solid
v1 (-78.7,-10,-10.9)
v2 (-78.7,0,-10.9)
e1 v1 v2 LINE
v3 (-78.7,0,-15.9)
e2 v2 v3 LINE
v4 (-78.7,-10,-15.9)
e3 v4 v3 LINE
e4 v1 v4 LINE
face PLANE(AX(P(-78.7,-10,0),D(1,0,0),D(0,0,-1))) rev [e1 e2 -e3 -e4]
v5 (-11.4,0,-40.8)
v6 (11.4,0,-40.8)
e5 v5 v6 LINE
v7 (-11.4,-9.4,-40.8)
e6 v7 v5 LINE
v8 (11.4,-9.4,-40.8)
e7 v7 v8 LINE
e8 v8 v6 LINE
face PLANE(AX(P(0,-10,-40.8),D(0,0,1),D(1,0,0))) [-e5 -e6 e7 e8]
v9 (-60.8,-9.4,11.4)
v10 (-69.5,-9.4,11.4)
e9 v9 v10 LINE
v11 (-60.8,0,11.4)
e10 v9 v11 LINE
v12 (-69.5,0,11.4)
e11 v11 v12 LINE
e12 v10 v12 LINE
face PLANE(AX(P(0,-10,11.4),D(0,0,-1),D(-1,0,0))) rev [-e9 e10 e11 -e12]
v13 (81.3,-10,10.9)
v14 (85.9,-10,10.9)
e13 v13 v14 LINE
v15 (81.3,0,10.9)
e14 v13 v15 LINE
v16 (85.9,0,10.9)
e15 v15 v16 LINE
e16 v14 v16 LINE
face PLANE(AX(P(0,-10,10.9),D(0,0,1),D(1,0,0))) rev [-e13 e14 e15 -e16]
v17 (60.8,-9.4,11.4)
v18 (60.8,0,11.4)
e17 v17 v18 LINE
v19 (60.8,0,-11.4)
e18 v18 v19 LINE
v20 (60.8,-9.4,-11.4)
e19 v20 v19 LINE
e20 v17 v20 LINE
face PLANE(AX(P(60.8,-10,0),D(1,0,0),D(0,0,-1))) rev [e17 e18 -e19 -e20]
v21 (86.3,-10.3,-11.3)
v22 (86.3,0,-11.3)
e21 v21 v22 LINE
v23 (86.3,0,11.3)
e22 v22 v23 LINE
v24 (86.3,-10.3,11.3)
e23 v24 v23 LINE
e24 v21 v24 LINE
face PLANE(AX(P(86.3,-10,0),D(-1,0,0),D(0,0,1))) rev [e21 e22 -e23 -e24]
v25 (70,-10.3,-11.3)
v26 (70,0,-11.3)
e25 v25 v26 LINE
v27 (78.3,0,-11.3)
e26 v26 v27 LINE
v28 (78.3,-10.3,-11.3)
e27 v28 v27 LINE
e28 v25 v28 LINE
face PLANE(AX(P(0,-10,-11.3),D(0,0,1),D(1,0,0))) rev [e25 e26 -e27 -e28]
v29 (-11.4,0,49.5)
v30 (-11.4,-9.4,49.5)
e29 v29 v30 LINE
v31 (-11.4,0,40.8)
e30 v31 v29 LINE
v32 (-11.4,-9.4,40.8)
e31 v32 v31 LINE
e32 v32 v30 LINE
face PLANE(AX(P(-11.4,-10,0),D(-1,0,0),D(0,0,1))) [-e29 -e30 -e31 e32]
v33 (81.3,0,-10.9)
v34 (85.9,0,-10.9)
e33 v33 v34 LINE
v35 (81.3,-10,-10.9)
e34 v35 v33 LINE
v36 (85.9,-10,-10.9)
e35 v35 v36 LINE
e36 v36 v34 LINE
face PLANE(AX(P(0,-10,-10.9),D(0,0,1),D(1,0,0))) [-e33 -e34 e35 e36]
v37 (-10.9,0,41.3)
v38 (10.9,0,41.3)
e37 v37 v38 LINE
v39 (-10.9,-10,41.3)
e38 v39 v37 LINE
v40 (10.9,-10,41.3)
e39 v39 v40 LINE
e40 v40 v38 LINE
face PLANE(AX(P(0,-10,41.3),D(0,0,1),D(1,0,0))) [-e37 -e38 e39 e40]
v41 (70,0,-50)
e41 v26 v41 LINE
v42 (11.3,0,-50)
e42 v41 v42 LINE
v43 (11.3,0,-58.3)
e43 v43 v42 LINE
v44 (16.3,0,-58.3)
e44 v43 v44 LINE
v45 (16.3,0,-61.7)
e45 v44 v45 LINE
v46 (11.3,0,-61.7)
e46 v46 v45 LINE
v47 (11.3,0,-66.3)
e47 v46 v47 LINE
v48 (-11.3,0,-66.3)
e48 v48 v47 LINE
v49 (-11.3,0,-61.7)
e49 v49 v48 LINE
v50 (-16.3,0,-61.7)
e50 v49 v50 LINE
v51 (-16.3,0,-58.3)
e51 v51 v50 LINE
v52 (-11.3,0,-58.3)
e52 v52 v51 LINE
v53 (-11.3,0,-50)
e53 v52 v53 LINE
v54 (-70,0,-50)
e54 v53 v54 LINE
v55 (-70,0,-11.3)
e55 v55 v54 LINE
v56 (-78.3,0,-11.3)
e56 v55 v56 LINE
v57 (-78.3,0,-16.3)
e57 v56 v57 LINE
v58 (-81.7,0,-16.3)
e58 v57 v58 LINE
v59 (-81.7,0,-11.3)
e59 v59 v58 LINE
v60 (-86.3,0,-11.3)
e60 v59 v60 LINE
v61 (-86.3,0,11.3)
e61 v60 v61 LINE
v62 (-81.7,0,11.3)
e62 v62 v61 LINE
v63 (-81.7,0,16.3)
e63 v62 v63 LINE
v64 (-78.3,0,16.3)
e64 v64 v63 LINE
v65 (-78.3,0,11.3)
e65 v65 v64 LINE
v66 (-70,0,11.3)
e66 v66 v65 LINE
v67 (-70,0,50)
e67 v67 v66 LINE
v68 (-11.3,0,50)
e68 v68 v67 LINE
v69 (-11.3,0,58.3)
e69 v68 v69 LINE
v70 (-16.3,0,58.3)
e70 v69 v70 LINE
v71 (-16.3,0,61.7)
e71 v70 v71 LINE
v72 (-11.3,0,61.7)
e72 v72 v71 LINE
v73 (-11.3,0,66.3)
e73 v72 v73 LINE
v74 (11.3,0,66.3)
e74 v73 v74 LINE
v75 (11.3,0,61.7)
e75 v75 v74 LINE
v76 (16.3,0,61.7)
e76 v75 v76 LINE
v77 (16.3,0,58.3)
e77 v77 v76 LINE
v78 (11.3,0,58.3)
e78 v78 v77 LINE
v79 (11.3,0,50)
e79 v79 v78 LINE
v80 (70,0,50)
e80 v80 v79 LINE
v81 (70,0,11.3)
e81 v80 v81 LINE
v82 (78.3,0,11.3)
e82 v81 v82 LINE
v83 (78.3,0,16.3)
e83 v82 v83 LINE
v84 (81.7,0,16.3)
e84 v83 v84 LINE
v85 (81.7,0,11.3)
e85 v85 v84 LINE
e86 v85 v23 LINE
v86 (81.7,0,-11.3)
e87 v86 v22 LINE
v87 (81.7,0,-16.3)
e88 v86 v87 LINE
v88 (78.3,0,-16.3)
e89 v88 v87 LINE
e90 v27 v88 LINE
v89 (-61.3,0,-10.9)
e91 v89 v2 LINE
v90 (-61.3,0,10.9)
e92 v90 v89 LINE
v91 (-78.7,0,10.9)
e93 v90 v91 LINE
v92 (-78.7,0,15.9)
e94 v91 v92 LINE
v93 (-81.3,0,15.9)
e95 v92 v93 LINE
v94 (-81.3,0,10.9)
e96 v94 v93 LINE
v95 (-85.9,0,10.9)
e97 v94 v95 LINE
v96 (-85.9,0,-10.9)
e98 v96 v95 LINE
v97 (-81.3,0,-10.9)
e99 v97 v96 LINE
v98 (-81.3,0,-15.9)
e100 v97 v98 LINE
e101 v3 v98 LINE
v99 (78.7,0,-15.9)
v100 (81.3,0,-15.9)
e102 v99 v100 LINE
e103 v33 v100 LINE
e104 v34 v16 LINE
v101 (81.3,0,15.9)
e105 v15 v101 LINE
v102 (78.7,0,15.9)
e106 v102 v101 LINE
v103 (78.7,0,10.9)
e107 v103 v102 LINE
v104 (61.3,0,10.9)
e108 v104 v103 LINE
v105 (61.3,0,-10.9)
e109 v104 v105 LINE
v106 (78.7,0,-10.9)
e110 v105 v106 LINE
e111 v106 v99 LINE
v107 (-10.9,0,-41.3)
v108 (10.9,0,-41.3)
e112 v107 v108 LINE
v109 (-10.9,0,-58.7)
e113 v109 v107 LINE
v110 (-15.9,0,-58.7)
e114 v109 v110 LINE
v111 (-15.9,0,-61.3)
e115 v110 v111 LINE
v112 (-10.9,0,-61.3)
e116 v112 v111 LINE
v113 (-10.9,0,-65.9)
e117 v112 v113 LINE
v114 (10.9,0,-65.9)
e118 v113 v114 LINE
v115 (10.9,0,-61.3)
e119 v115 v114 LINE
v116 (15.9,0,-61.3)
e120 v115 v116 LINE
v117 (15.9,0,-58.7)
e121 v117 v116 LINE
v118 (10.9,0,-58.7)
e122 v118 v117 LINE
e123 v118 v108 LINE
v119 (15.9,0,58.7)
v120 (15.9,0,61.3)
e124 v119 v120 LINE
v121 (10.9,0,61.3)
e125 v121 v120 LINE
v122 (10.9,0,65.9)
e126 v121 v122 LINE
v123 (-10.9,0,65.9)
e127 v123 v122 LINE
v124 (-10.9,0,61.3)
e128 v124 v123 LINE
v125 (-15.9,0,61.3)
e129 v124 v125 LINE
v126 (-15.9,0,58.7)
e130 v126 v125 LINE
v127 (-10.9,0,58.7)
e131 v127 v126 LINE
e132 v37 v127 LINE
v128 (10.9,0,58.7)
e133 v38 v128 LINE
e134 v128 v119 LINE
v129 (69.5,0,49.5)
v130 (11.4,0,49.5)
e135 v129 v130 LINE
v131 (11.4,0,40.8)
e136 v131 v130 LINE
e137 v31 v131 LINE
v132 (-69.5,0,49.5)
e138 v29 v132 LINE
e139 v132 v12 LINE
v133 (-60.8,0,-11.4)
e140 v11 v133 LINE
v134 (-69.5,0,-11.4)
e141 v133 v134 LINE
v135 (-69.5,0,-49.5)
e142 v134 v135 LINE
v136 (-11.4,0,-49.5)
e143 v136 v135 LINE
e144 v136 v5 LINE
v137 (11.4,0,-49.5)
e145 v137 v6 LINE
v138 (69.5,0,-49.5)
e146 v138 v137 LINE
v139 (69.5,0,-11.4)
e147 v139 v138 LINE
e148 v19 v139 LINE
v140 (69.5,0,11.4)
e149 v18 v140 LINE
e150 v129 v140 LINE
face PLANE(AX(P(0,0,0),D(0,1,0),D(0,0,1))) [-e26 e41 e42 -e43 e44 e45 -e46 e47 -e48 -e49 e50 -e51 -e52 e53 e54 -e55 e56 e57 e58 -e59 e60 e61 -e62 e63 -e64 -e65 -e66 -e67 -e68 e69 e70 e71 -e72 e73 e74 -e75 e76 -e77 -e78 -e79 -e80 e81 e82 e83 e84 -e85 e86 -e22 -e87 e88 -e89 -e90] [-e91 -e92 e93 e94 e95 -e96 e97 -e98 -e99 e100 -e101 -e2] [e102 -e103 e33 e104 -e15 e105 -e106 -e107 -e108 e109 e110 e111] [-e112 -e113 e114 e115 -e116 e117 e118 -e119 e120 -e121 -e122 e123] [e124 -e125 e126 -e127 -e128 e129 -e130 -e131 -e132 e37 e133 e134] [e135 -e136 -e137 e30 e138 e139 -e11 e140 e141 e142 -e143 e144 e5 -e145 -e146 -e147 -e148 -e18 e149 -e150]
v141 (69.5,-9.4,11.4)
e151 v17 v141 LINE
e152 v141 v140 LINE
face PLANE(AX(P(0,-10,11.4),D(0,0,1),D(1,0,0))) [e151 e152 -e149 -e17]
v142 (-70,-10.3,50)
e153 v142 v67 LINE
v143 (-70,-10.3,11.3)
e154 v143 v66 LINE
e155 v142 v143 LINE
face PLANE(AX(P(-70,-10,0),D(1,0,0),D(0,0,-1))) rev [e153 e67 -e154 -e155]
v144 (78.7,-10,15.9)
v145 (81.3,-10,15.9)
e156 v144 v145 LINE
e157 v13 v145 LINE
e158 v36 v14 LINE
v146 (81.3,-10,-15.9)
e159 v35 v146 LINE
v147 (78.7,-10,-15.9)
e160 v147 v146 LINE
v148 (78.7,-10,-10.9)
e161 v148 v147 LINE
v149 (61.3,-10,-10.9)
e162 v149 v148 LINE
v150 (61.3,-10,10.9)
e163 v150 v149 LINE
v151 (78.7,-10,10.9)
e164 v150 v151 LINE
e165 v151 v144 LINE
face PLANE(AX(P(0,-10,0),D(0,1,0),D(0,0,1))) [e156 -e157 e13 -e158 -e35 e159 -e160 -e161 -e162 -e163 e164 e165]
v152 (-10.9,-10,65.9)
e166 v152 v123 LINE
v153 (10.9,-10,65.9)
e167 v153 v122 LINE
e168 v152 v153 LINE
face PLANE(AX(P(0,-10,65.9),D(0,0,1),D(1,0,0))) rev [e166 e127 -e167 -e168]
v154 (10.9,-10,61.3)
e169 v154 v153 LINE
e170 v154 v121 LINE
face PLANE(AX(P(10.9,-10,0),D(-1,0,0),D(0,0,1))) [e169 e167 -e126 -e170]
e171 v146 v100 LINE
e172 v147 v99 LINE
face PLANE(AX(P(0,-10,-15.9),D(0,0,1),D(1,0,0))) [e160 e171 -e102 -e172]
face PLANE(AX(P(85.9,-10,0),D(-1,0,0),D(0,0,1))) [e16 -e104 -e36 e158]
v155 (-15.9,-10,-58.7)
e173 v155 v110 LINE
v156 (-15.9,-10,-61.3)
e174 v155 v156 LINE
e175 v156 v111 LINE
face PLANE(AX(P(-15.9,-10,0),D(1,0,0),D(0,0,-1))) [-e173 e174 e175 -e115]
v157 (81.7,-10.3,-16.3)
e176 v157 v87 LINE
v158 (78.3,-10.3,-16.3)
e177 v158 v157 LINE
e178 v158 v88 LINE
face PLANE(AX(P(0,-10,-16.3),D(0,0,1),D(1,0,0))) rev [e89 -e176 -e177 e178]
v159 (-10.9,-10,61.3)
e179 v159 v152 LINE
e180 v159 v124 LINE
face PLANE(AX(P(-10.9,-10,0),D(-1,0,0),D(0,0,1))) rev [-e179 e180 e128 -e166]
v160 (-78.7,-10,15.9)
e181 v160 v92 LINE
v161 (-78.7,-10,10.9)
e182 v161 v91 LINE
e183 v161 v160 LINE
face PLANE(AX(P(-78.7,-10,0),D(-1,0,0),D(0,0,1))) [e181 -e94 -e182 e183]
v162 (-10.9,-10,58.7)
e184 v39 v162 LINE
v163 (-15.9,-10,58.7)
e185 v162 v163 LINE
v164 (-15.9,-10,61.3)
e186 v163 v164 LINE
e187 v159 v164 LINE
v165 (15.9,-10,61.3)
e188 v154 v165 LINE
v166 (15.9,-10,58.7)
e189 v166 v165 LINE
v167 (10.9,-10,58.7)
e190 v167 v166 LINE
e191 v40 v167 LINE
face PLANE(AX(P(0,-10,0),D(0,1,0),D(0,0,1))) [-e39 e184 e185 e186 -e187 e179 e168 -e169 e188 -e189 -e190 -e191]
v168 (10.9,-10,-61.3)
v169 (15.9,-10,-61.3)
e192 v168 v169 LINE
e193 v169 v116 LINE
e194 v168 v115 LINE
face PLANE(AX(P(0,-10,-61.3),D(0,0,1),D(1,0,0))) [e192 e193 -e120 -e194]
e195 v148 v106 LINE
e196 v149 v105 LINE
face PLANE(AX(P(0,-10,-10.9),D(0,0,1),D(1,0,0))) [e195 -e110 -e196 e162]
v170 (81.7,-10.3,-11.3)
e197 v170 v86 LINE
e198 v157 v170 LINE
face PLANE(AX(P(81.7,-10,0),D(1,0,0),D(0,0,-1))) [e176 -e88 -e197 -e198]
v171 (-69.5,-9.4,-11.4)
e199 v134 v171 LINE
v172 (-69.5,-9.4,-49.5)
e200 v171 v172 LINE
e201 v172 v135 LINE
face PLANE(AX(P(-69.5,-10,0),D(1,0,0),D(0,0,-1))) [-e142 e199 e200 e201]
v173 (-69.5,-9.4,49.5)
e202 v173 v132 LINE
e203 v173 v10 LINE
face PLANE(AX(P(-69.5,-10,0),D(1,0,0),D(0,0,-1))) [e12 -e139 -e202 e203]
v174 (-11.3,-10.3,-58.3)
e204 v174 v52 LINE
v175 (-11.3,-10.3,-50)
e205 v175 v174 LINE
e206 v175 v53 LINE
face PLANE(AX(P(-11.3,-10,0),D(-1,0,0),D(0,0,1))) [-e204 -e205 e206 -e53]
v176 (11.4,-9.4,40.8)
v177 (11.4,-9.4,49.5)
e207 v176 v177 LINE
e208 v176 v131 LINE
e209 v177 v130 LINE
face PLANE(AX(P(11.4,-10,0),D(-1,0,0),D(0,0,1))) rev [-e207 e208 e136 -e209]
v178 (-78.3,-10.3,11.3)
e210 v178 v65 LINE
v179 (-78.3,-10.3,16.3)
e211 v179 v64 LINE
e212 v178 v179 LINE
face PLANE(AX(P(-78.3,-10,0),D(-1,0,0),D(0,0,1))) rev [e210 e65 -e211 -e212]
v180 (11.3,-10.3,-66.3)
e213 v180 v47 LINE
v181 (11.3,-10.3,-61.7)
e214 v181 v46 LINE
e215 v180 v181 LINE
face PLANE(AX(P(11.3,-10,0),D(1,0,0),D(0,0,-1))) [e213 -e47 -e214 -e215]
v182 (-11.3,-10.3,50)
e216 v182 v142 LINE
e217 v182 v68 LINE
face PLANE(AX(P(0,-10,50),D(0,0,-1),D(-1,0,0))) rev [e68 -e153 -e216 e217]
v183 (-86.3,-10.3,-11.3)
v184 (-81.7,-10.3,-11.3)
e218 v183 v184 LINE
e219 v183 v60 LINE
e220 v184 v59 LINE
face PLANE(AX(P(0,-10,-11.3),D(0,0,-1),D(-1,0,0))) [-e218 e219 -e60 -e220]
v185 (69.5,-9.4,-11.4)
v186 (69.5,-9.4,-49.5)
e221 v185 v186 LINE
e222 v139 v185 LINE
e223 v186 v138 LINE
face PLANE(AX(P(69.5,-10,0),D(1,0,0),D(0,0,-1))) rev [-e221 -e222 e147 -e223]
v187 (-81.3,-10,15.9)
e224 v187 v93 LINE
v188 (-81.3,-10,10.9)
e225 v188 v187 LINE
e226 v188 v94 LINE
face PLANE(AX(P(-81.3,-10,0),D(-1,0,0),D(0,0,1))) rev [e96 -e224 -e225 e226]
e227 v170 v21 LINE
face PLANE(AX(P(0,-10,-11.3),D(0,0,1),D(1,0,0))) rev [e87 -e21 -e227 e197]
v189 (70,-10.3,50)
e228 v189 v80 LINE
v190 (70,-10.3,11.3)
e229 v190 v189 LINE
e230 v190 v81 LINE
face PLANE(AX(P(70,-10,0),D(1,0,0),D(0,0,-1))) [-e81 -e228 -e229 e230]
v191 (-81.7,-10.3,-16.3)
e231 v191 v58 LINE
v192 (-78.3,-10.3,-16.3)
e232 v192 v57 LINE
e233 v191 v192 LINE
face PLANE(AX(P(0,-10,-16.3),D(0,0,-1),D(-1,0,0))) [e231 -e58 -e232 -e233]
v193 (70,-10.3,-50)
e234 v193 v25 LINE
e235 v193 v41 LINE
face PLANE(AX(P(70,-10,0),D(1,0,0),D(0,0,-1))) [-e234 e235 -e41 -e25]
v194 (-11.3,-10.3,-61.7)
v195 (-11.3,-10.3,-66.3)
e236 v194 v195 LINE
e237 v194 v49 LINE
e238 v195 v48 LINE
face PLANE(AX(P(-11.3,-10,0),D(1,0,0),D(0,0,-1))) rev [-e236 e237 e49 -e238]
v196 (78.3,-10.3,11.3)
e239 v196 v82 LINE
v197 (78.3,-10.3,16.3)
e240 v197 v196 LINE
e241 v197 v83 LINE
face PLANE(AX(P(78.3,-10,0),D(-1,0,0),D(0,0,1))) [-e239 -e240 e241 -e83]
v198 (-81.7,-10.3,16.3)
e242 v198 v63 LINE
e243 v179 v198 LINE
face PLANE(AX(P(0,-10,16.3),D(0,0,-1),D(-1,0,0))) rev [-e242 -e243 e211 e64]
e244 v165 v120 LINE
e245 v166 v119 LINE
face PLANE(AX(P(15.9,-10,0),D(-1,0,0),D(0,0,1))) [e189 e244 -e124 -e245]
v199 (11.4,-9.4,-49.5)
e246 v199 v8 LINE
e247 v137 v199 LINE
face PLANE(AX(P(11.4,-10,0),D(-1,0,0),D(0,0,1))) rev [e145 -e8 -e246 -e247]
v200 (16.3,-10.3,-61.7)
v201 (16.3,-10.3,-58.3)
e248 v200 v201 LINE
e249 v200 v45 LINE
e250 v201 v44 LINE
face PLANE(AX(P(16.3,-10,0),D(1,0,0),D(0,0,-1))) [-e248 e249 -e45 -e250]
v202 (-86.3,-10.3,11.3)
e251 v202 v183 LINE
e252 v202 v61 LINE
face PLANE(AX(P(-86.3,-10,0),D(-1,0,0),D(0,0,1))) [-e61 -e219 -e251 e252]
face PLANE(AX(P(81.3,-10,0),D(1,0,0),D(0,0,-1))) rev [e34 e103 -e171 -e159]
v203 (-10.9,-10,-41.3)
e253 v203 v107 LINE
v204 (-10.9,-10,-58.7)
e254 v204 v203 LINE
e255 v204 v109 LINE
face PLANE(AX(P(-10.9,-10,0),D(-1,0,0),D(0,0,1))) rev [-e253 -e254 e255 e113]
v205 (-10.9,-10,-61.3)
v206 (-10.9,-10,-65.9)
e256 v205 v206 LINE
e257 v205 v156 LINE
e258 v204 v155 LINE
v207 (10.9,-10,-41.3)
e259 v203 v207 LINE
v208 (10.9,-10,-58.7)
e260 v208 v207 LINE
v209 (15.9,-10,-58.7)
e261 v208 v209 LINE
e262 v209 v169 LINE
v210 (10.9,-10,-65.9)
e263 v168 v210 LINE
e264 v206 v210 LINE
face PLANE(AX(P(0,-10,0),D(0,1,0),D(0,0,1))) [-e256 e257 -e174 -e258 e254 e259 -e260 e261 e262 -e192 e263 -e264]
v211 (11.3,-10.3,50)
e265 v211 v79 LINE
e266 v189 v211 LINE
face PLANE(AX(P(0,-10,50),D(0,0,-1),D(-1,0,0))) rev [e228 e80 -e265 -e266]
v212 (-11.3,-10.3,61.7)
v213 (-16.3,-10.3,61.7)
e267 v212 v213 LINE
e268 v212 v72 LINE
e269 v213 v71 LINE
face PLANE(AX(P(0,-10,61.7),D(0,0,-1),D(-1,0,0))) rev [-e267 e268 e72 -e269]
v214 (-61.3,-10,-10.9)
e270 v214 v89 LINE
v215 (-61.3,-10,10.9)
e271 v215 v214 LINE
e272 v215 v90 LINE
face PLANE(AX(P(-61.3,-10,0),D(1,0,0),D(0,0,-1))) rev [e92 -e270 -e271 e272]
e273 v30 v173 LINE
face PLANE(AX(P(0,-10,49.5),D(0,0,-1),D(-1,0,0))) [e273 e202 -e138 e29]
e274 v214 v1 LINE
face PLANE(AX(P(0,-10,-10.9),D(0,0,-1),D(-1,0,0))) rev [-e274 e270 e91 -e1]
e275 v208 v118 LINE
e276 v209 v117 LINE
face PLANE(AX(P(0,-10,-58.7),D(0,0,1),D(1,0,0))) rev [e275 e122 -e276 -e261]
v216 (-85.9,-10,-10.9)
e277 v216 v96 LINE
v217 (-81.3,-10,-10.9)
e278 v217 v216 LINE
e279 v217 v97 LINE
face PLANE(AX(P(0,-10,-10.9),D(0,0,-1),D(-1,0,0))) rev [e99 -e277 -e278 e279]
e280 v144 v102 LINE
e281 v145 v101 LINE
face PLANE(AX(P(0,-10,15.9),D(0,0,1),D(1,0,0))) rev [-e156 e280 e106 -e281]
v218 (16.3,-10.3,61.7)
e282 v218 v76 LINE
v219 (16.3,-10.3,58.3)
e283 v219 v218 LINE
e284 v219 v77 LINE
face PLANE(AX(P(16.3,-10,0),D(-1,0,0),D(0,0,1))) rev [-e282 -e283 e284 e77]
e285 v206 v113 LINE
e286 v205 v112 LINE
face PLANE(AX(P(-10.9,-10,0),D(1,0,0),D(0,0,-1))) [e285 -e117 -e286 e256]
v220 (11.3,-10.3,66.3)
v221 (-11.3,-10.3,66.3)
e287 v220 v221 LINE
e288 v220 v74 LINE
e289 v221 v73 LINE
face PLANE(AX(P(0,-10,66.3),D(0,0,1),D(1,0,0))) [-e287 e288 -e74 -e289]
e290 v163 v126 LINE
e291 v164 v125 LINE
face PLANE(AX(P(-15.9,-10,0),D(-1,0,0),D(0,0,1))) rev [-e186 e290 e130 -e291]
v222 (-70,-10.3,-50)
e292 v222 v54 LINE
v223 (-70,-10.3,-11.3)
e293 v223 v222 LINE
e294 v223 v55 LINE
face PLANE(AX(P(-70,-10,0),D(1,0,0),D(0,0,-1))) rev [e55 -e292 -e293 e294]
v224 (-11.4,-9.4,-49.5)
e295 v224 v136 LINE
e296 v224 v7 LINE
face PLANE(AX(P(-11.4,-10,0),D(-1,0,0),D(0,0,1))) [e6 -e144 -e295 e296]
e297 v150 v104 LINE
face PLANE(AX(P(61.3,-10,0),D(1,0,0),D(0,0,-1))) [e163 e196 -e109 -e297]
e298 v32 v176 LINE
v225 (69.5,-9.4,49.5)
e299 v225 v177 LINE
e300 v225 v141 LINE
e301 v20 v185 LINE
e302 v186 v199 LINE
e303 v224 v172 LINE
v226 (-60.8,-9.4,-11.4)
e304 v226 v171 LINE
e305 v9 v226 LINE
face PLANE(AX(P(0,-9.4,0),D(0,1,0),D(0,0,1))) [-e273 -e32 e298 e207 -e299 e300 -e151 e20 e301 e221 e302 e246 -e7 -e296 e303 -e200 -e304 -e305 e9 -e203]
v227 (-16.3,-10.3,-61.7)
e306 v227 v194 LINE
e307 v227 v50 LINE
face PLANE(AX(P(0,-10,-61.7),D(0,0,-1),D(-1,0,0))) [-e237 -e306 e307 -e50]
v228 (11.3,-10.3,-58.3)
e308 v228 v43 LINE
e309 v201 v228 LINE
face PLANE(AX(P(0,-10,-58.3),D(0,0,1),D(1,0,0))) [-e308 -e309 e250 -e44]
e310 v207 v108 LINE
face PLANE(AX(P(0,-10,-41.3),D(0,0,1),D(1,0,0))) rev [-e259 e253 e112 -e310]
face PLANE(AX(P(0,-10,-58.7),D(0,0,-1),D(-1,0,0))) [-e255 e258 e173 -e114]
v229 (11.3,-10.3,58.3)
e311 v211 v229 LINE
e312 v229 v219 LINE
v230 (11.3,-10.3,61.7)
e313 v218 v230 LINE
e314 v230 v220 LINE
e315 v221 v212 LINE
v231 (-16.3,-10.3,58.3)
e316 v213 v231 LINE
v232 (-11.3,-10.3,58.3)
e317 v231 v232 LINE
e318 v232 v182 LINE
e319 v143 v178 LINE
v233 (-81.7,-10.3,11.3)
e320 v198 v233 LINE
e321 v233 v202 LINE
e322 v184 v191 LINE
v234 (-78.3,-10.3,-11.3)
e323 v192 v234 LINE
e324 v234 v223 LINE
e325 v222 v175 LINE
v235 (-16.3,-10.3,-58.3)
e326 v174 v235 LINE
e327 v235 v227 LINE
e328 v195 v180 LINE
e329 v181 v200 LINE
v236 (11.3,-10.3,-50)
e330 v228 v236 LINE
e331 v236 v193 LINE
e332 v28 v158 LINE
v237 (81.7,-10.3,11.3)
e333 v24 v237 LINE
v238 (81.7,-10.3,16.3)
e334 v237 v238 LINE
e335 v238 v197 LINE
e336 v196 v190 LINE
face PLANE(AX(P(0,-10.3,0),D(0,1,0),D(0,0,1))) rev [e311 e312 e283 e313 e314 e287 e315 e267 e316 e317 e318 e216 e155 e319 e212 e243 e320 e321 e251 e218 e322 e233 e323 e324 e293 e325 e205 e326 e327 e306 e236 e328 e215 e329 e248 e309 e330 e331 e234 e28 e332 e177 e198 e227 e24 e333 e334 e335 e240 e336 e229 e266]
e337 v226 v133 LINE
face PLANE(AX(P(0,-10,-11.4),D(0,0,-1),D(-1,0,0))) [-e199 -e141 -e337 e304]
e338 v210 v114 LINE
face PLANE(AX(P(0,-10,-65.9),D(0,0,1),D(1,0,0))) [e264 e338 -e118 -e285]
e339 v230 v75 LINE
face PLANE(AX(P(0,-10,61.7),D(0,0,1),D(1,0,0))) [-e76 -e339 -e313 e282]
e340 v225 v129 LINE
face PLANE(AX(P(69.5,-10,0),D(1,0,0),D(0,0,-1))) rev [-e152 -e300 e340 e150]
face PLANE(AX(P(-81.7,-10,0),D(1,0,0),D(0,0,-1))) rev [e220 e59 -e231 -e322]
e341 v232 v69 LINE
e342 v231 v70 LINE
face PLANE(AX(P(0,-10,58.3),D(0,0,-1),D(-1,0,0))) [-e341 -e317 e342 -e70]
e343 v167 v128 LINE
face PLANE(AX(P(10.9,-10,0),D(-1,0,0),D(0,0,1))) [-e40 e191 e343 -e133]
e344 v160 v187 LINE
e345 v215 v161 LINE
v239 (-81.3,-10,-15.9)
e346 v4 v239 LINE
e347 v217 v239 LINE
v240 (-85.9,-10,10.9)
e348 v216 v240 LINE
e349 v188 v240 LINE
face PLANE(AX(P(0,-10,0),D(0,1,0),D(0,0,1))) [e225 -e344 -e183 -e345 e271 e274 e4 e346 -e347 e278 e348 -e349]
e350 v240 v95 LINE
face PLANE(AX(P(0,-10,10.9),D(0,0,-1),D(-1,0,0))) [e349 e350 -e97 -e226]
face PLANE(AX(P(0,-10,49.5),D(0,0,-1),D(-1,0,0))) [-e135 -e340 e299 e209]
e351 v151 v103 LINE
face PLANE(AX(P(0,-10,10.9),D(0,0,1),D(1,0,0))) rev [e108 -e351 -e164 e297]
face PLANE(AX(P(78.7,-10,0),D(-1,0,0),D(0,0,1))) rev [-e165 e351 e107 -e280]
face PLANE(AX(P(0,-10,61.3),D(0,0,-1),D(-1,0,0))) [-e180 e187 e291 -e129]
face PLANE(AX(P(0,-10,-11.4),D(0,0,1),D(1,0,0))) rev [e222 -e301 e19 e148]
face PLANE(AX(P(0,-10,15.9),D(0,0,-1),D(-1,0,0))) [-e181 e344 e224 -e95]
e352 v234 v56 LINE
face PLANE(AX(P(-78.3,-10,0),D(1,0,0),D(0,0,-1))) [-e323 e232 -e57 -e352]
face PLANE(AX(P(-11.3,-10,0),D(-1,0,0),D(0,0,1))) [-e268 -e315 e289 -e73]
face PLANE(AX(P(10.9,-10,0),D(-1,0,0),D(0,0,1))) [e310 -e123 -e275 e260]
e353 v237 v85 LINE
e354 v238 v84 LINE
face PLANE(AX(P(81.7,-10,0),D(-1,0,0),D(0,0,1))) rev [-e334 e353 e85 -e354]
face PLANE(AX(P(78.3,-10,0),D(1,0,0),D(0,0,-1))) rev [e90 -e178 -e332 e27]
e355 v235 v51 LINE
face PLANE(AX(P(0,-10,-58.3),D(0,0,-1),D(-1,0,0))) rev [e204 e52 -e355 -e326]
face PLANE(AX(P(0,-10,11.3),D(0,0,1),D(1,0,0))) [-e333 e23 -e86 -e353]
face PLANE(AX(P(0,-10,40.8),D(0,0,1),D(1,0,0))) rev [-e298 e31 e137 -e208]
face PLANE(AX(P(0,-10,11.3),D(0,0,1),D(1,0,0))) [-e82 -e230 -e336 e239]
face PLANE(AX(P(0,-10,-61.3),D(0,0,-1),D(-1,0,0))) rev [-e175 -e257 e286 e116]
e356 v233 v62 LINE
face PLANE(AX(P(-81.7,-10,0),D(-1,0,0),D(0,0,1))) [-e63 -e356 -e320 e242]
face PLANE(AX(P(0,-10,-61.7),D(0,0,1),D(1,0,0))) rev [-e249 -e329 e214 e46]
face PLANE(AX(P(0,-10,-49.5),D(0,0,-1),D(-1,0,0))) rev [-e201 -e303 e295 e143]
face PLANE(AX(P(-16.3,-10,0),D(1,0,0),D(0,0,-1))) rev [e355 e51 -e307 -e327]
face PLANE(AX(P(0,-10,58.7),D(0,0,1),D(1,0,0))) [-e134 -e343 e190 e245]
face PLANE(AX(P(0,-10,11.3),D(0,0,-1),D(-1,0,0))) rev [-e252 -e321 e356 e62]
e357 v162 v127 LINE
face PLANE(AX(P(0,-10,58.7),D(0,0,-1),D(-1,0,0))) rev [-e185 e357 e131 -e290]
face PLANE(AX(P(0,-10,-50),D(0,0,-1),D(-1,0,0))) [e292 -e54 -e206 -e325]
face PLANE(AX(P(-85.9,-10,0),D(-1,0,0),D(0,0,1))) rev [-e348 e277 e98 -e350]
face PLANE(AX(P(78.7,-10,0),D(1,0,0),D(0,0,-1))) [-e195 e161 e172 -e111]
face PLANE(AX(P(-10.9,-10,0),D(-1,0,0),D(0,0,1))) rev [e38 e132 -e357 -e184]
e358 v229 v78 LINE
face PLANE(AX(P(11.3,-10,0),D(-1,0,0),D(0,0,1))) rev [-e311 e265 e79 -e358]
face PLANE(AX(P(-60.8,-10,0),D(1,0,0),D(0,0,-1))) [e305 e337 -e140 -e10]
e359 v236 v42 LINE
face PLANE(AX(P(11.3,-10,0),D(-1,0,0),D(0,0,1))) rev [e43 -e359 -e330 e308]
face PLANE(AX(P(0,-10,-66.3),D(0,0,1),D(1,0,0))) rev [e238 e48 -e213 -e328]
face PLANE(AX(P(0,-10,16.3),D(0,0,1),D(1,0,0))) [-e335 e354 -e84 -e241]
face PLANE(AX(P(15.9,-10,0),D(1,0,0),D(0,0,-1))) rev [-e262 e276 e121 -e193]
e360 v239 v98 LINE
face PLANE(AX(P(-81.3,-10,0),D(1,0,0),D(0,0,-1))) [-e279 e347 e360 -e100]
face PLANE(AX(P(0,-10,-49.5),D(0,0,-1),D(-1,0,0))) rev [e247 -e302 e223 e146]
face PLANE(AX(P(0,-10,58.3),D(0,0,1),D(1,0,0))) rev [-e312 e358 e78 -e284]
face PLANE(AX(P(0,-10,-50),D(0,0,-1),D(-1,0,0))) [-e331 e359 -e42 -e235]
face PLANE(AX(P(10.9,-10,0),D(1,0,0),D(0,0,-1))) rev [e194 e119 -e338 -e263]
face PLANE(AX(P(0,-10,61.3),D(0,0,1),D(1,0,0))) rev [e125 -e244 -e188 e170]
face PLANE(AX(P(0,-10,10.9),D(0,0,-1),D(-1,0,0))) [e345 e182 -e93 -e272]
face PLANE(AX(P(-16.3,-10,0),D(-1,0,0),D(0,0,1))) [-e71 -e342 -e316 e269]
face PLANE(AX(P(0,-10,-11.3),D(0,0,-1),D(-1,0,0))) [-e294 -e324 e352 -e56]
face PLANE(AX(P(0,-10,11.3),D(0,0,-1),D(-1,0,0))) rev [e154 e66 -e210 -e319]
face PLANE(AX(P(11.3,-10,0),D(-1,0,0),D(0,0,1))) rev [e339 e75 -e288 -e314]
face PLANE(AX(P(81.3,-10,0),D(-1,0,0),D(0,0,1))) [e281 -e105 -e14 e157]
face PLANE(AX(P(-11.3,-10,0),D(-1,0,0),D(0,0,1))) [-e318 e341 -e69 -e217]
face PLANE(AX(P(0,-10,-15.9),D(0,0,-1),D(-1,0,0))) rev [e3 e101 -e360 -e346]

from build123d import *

# Parameters (mm, degrees)
SALIENTE_EXTRUIR1_DEPTH = 10
VACIADO2_START          = -40.8
VACIADO2_OUTLINE_W      = 121.6
VACIADO2_OUTLINE_H      = 9.4
VACIADO2_DEPTH          = 81.6
VACIADO2_START_2        = -49.5
VACIADO2_2_OUTLINE_W    = 49.4
VACIADO2_2_OUTLINE_H    = 9.4
VACIADO2_2_DEPTH        = 99
VACIADO2_3_OUTLINE_W    = 8.7
VACIADO2_3_OUTLINE_H    = 9.4
VACIADO2_3_DEPTH        = 38.1
VACIADO2_START_3        = 11.4
VACIADO2_4_OUTLINE_W    = 8.7
VACIADO2_4_OUTLINE_H    = 9.4
VACIADO2_4_DEPTH        = 38.1
SALIENTE_EXTRUIR6_DEPTH = 0.3


# Read off the part's stored shape, not the designer's step: Vaciado2
with BuildPart() as part:
    # Croquis1 → Saliente-Extruir1 (new body)
    with BuildSketch(Plane(origin=(0, 0, 0), x_dir=(1, 0, 0), z_dir=(0, 1, 0))):
        Polygon((-11.3, -50), (-11.3, -58.3), (-16.3, -58.3), (-16.3, -61.7), (-11.3, -61.7), (-11.3, -66.3), (11.3, -66.3), (11.3, -61.7), (16.3, -61.7), (16.3, -58.3), (11.3, -58.3), (11.3, -50), (70, -50), (70, -11.3), (78.3, -11.3), (78.3, -16.3), (81.7, -16.3), (81.7, -11.3), (86.3, -11.3), (86.3, 11.3), (81.7, 11.3), (81.7, 16.3), (78.3, 16.3), (78.3, 11.3), (70, 11.3), (70, 50), (11.3, 50), (11.3, 58.3), (16.3, 58.3), (16.3, 61.7), (11.3, 61.7), (11.3, 66.3), (-11.3, 66.3), (-11.3, 61.7), (-16.3, 61.7), (-16.3, 58.3), (-11.3, 58.3), (-11.3, 50), (-70, 50), (-70, 11.3), (-78.3, 11.3), (-78.3, 16.3), (-81.7, 16.3), (-81.7, 11.3), (-86.3, 11.3), (-86.3, -11.3), (-81.7, -11.3), (-81.7, -16.3), (-78.3, -16.3), (-78.3, -11.3), (-70, -11.3), (-70, -50), align=None)
        Polygon((-10.9, 41.3), (-10.9, 58.7), (-15.9, 58.7), (-15.9, 61.3), (-10.9, 61.3), (-10.9, 65.9), (10.9, 65.9), (10.9, 61.3), (15.9, 61.3), (15.9, 58.7), (10.9, 58.7), (10.9, 41.3), align=None, mode=Mode.SUBTRACT)
        Polygon((-10.9, -41.3), (10.9, -41.3), (10.9, -58.7), (15.9, -58.7), (15.9, -61.3), (10.9, -61.3), (10.9, -65.9), (-10.9, -65.9), (-10.9, -61.3), (-15.9, -61.3), (-15.9, -58.7), (-10.9, -58.7), align=None, mode=Mode.SUBTRACT)
        Polygon((-61.3, -10.9), (-78.7, -10.9), (-78.7, -15.9), (-81.3, -15.9), (-81.3, -10.9), (-85.9, -10.9), (-85.9, 10.9), (-81.3, 10.9), (-81.3, 15.9), (-78.7, 15.9), (-78.7, 10.9), (-61.3, 10.9), align=None, mode=Mode.SUBTRACT)
        Polygon((61.3, -10.9), (61.3, 10.9), (78.7, 10.9), (78.7, 15.9), (81.3, 15.9), (81.3, 10.9), (85.9, 10.9), (85.9, -10.9), (81.3, -10.9), (81.3, -15.9), (78.7, -15.9), (78.7, -10.9), align=None, mode=Mode.SUBTRACT)
    extrude(amount=-SALIENTE_EXTRUIR1_DEPTH)

    # Vaciado2 outline → Vaciado2 (cut)
    with BuildSketch(Plane.XY.offset(VACIADO2_START)):
        with Locations((0, -4.7)):
            Rectangle(VACIADO2_OUTLINE_W, VACIADO2_OUTLINE_H)
    extrude(amount=VACIADO2_DEPTH, mode=Mode.SUBTRACT)

    # Vaciado2 2 outline → Vaciado2 2 (cut)
    with BuildSketch(Plane.XY.offset(VACIADO2_START_2)):
        with Locations((-36.1, -4.7)):
            Rectangle(VACIADO2_2_OUTLINE_W, VACIADO2_2_OUTLINE_H)
        with Locations((36.1, -4.7)):
            Rectangle(VACIADO2_2_OUTLINE_W, VACIADO2_2_OUTLINE_H)
    extrude(amount=VACIADO2_2_DEPTH, mode=Mode.SUBTRACT)

    # Vaciado2 3 outline → Vaciado2 3 (cut)
    with BuildSketch(Plane.XY.offset(VACIADO2_START_2)):
        with Locations((-65.15, -4.7)):
            Rectangle(VACIADO2_3_OUTLINE_W, VACIADO2_3_OUTLINE_H)
        with Locations((65.15, -4.7)):
            Rectangle(VACIADO2_3_OUTLINE_W, VACIADO2_3_OUTLINE_H)
    extrude(amount=VACIADO2_3_DEPTH, mode=Mode.SUBTRACT)

    # Vaciado2 4 outline → Vaciado2 4 (cut)
    with BuildSketch(Plane.XY.offset(VACIADO2_START_3)):
        with Locations((-65.15, -4.7)):
            Rectangle(VACIADO2_4_OUTLINE_W, VACIADO2_4_OUTLINE_H)
        with Locations((65.15, -4.7)):
            Rectangle(VACIADO2_4_OUTLINE_W, VACIADO2_4_OUTLINE_H)
    extrude(amount=VACIADO2_4_DEPTH, mode=Mode.SUBTRACT)

    # Croquis4 → Saliente-Extruir6 (add)
    with BuildSketch(Plane.XZ.offset(10)):
        Polygon((-11.3, 50), (-70, 50), (-70, 11.3), (-78.3, 11.3), (-78.3, 16.3), (-81.7, 16.3), (-81.7, 11.3), (-86.3, 11.3), (-86.3, -11.3), (-81.7, -11.3), (-81.7, -16.3), (-78.3, -16.3), (-78.3, -11.3), (-70, -11.3), (-70, -50), (-11.3, -50), (-11.3, -58.3), (-16.3, -58.3), (-16.3, -61.7), (-11.3, -61.7), (-11.3, -66.3), (11.3, -66.3), (11.3, -61.7), (16.3, -61.7), (16.3, -58.3), (11.3, -58.3), (11.3, -50), (70, -50), (70, -11.3), (78.3, -11.3), (78.3, -16.3), (81.7, -16.3), (81.7, -11.3), (86.3, -11.3), (86.3, 11.3), (81.7, 11.3), (81.7, 16.3), (78.3, 16.3), (78.3, 11.3), (70, 11.3), (70, 50), (11.3, 50), (11.3, 58.3), (16.3, 58.3), (16.3, 61.7), (11.3, 61.7), (11.3, 66.3), (-11.3, 66.3), (-11.3, 61.7), (-16.3, 61.7), (-16.3, 58.3), (-11.3, 58.3), align=None)
    extrude(amount=SALIENTE_EXTRUIR6_DEPTH)


solid = part.part
